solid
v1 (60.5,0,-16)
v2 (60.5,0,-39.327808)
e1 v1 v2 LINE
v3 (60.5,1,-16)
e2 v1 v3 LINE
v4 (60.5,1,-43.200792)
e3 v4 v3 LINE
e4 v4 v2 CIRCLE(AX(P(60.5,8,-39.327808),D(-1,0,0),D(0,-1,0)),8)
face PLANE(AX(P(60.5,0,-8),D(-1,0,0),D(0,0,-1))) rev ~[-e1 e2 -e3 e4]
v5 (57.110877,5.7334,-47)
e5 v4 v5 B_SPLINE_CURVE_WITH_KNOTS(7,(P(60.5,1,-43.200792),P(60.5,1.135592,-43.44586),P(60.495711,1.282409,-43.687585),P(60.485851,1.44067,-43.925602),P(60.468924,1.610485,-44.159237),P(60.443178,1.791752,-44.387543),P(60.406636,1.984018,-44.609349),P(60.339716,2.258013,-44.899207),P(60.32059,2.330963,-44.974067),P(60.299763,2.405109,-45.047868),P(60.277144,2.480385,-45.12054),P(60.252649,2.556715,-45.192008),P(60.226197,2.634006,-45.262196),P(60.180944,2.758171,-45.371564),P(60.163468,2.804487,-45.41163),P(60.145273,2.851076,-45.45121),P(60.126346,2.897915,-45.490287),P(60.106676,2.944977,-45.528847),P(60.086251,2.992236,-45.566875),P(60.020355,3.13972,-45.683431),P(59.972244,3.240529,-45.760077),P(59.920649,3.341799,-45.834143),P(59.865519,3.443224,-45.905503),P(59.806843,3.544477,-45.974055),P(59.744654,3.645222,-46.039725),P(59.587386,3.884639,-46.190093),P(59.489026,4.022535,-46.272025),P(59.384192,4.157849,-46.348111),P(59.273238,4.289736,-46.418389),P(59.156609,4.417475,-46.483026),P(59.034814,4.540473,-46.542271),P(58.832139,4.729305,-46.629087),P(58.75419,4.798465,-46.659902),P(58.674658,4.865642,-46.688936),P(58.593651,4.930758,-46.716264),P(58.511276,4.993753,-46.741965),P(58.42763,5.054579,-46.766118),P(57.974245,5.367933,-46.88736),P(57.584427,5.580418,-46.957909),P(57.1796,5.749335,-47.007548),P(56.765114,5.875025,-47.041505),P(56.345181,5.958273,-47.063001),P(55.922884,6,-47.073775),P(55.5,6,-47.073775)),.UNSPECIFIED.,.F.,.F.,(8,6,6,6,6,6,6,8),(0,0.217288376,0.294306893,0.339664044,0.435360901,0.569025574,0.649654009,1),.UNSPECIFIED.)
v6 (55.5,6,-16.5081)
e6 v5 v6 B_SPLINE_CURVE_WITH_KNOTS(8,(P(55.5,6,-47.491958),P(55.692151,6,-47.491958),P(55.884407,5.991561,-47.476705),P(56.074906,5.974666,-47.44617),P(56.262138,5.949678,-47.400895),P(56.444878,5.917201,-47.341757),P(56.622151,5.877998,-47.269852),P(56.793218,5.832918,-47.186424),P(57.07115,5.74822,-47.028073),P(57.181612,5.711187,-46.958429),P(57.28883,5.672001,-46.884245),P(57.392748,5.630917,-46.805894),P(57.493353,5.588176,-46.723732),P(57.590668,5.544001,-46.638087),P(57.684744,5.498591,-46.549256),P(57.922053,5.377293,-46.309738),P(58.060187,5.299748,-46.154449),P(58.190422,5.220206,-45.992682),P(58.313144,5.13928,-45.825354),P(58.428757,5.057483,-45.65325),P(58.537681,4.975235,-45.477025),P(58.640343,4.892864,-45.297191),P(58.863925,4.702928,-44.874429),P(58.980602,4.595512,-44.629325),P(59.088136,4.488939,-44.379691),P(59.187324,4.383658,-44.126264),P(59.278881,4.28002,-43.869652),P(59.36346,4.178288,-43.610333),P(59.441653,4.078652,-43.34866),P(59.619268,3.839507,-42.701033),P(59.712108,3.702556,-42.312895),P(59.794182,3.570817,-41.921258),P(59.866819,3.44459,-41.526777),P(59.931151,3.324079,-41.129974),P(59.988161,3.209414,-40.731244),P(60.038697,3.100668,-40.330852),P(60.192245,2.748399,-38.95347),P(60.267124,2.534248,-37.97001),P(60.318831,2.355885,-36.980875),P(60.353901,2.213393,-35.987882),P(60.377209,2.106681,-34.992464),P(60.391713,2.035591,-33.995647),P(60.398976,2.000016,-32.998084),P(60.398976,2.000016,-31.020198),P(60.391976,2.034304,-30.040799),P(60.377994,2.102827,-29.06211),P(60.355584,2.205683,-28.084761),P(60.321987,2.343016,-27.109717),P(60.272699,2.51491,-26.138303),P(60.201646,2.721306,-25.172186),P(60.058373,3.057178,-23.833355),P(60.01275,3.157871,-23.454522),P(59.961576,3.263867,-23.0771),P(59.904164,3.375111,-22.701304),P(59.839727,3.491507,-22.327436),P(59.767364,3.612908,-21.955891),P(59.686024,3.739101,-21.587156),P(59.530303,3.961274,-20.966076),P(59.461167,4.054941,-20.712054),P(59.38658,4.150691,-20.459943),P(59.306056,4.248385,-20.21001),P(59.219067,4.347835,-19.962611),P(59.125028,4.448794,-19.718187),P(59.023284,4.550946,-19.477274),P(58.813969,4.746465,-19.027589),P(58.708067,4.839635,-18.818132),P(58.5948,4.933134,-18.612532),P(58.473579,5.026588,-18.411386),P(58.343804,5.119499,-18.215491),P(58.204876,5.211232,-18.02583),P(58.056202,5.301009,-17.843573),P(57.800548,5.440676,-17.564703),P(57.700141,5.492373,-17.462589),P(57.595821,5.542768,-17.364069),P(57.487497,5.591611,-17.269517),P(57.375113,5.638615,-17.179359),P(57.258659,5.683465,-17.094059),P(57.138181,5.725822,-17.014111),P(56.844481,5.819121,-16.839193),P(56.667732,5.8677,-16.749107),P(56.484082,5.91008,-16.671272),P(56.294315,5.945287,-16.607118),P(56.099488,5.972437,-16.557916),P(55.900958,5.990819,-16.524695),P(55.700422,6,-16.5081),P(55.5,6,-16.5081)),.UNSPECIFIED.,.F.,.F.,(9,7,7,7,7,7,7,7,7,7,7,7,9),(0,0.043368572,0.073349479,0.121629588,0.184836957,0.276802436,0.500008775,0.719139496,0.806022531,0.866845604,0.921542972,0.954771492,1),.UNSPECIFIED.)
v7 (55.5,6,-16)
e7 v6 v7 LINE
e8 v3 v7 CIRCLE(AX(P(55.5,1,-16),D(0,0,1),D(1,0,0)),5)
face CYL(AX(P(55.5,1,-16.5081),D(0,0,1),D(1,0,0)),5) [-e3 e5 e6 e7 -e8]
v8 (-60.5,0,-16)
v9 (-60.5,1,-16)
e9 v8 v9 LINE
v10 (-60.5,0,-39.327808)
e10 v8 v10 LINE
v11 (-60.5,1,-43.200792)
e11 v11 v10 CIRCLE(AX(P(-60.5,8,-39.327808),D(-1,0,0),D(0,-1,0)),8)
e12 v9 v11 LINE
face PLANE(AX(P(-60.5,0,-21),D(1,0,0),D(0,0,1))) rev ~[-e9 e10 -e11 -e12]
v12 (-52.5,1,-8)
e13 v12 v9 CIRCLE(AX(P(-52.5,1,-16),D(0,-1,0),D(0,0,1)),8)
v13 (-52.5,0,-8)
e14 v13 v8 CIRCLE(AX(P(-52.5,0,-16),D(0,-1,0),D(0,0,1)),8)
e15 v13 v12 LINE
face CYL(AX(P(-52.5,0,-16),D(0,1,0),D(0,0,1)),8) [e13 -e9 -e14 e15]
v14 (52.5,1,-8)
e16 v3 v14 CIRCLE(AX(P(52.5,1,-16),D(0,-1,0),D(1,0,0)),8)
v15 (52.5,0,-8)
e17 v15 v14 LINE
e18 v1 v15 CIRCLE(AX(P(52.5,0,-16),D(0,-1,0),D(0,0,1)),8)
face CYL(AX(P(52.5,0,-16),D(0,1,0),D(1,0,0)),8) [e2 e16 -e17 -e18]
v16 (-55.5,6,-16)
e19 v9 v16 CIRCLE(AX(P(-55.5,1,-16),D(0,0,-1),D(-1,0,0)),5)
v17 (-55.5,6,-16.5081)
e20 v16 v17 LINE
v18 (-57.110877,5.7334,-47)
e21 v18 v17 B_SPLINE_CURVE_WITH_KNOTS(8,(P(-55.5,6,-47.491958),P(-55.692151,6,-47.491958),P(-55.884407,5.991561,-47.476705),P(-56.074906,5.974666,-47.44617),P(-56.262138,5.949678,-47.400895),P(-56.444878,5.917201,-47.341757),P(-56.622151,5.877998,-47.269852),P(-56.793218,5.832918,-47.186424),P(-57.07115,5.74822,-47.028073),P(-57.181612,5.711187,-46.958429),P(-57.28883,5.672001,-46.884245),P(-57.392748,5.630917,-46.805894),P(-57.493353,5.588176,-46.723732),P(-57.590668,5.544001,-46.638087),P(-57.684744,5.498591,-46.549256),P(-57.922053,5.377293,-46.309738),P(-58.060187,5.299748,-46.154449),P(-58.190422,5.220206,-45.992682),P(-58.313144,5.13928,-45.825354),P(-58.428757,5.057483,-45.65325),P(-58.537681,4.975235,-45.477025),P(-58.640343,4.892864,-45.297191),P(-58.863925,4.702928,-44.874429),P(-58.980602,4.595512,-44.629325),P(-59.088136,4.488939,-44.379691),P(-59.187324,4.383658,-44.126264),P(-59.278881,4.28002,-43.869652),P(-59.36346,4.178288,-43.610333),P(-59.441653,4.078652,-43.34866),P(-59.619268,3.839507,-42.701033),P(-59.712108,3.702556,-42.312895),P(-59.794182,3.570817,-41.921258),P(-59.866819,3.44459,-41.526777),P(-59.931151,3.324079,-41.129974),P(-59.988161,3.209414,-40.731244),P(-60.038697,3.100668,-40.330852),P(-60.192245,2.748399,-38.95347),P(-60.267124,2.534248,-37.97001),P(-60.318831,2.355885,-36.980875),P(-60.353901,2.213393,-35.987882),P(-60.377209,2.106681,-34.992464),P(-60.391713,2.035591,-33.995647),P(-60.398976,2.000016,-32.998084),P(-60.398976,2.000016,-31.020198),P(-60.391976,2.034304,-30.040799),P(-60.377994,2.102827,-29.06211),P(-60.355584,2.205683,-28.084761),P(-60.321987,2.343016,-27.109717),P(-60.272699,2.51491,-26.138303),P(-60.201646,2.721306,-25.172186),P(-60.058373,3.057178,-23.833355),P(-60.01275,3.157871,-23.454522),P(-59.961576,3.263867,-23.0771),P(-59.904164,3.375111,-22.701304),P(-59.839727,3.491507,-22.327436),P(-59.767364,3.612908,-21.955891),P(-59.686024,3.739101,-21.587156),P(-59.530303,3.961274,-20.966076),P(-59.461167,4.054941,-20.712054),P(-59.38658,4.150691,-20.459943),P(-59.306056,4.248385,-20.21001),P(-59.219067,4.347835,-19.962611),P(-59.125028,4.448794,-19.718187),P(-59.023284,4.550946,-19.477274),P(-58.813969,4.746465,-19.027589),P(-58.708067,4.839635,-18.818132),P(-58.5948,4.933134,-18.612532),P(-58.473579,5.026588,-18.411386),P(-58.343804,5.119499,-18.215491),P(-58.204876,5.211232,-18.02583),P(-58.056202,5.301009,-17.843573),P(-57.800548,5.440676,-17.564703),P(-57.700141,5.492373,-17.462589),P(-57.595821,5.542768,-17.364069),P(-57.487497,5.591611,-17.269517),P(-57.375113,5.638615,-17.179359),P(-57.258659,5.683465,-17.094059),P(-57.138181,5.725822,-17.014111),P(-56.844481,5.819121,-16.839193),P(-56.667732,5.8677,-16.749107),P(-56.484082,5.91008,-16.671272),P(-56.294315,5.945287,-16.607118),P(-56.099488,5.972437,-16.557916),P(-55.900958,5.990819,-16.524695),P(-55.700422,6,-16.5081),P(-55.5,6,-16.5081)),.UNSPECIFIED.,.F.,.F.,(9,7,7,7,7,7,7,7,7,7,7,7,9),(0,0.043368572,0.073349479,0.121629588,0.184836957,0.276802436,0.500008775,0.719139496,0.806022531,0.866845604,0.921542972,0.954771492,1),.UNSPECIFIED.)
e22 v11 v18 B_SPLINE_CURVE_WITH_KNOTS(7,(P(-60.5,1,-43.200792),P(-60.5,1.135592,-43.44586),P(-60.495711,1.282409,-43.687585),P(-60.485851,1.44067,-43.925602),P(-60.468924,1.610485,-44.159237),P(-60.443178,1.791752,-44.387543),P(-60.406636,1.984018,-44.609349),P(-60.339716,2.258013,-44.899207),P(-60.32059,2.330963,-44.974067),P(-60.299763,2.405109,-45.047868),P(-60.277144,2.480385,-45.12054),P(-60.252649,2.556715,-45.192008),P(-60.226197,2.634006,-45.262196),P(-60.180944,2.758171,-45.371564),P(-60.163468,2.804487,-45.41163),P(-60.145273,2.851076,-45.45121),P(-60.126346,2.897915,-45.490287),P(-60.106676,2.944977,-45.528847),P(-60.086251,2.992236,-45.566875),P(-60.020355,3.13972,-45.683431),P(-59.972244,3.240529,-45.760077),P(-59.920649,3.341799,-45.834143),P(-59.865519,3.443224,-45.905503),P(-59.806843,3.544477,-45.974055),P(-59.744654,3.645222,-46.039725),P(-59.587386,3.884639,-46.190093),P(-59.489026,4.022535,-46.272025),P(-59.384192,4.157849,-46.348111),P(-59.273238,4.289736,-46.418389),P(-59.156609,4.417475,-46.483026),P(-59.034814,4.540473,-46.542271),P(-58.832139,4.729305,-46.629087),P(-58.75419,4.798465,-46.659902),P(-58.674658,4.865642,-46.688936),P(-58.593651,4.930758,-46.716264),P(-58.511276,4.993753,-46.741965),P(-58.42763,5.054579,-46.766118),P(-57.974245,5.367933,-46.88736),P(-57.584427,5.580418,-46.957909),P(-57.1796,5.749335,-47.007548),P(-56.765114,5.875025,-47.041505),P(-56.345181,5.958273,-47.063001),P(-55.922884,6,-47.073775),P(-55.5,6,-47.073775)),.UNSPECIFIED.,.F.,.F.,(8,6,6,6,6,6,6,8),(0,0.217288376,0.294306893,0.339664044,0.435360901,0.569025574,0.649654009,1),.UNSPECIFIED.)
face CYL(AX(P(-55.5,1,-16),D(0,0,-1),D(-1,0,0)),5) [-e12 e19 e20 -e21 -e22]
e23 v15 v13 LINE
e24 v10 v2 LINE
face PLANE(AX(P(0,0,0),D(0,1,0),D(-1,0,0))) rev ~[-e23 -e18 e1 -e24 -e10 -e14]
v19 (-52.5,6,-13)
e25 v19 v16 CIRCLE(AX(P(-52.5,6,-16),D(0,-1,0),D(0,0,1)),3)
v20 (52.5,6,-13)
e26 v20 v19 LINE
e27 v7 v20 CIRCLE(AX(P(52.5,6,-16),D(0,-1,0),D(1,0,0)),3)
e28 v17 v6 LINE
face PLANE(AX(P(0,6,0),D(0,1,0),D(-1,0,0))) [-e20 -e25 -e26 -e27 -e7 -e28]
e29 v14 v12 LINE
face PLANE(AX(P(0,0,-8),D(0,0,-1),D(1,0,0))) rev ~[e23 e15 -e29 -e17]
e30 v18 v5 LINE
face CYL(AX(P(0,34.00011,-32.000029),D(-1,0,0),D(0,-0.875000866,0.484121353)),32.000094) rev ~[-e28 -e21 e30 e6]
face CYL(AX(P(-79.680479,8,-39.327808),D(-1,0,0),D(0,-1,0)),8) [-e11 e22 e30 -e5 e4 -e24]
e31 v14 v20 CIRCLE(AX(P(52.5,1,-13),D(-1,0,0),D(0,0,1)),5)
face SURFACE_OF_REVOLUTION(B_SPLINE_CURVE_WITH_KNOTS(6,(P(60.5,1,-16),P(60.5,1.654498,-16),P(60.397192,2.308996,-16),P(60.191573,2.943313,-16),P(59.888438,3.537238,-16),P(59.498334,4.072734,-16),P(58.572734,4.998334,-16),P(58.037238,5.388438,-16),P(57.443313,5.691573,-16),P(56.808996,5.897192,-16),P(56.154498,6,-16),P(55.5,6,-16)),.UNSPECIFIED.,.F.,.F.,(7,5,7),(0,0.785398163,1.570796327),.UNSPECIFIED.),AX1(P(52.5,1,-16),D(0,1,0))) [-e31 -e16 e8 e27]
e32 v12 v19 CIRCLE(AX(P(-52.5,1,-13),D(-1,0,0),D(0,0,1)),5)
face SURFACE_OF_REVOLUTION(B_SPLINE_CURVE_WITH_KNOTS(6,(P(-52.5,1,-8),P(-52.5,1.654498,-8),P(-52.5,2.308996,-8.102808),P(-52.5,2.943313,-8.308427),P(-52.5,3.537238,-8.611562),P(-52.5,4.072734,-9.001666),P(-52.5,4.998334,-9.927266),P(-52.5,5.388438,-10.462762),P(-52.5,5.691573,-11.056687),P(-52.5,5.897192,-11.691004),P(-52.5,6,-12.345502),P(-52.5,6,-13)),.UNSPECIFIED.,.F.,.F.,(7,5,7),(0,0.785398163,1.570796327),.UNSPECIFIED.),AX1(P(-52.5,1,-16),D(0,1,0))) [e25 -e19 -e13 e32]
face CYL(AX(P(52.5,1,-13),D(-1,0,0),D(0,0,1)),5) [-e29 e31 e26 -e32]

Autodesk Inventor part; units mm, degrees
ref_plane "YZ Plane" through (0, 0, 0) normal (1, 0, 0) x (0, 1, 0)
ref_plane "XZ Plane" through (0, 0, 0) normal (0, 1, 0) x (-1, 0, 0)
ref_plane "XY Plane" through (0, 0, 0) normal (0, 0, 1) x (1, 0, 0)
sketch "Sketch1" plane through (0, 0, 0) normal (0, 1, 0) x (-1, 0, 0)
  line L0 (25.9, 0) -> (-25.9, 0) projected
  line L1 (0, -25.9) -> (0, 25.9) projected
  circle A0 centre (0, 0) radius 18.5 construction
  circle A1 centre (0, 0) radius 13 construction
  dimension "d0" = 37
  dimension "d1" = 26
sketch "Sketch2" plane through (0, 0, 0) normal (0, 1, 0) x (-1, 0, 0)
  line L0 (0, -28.9) -> (0, 26.4) projected
  line L1 (-60.5, -8) -> (-60.5, -21)
  line L2 (-60.5, -21) -> (60.5, -21)
  line L3 (60.5, -21) -> (60.5, -8)
  line L4 (60.5, -8) -> (-60.5, -8)
  line L5 (-84.7, 0) -> (84.7, 0) projected
  point P0 (0, 0)
  dimension "d3" = 121
  dimension "d99" = 8
  dimension "d101" = 21
extrude "Extrusion1" add sketch "Sketch2" along normal blind 6
sketch "Sketch6" plane through (0, 0, 0) normal (0, 1, 0) x (-1, 0, 0)
  line L0 (60.5, -21) -> (-60.5, -21) projected
  line L1 (60.5, -8) -> (60.5, -21) projected
  line L2 (-60.5, -21) -> (60.5, -21)
  line L3 (60.5, -21) -> (60.5, -8)
  line L4 (-60.5, -8) -> (-60.5, -21)
  line L5 (84.7, 0) -> (-84.7, 0) projected
  line L6 (0, -28.9) -> (0, 26.4) projected
  arc A0 (-16, 0) -> (16, 0) centre (0, 0) ccw
  line L7 (16, 0) -> (16, 0)
  line L8 (60.5, 0) -> (-60.5, 0) projected
  line L9 (16, 0) -> (60.5, 0)
  line L10 (-16, 0) -> (-16, 0)
  line L11 (-16, 0) -> (-60.5, 0)
  point P0 (-17.3617, -21)
  dimension "d18" = 32
extrude "Extrusion5" [suppressed]
sketch "Sketch4" plane through (0, 0, 0) normal (0, 0, 1) x (1, 0, 0)
  line L0 (-18.5, 0) -> (18.5, 0)
  line L1 (18.5, 0) -> (18.5, -2)
  line L2 (18.5, -2) -> (-18.5, -2)
  line L3 (-18.5, -2) -> (-18.5, 0)
  line L4 (-25.9, 0) -> (25.9, 0) projected
  line L5 (0, -2.4) -> (0, 0.4) projected
  point P0 (0, 0)
  dimension "d10" = 37
  dimension "d11" = 2
extrude "Extrusion6" [suppressed]
sketch "Sketch5" plane through (0, 0, 0) normal (0, 1, 0) x (-1, 0, 0)
  circle A0 centre (0, 0) radius 18.5 construction
  circle A1 centre (0, 0) radius 18.5 construction
  line L0 (25.9, 0) -> (-25.9, 0) projected
  line L1 (0, -28.9) -> (0, 26.4) projected
  line L2 (-18.5, -21) -> (18.5, -21)
  line L3 (18.5, -21) -> (18.5, -18.5)
  line L4 (18.5, -18.5) -> (-18.5, -18.5)
  line L5 (-18.5, -18.5) -> (-18.5, -21)
  dimension "d25" = 37
  dimension "d26" = 21
extrude "Extrusion7" [suppressed]
sketch "Sketch7" plane through (0, 0, 0) normal (0, 0, 1) x (1, 0, 0)
  line L0 (-18.5, 0) -> (18.5, 0)
  line L1 (18.5, 0) -> (18.5, -2)
  line L2 (18.5, -2) -> (-18.5, -2)
  line L3 (-18.5, -2) -> (-18.5, 0)
  line L4 (60.5, 0) -> (-60.5, 0) projected
  line L5 (-84.7, 0) -> (84.7, 0) projected
  line L6 (0, -2.4) -> (0, 0.4) projected
  point P0 (-16, 0)
  point P1 (16, 0)
  dimension "d53" = 2
  dimension "d54" = 18.5
extrude "Extrusion8" [suppressed]
sketch "Sketch8" plane through (0, 0, 0) normal (0, 1, 0) x (-1, 0, 0)
  circle A0 centre (0, 0) radius 12.75
  dimension "d34" = 25.5
extrude "Extrusion9" [suppressed]
pattern_linear "Rectangular Pattern1" [suppressed]
sketch "Sketch9" plane through (0, 6, 0) normal (0, 1, 0) x (1, 0, 0)
  circle A0 centre (0, 0) radius 13
  circle A1 centre (0, 0) radius 15
  dimension "d40" = 26
  dimension "d41" = 30
extrude "Extrusion10" [suppressed]
sketch "Sketch10" plane through (0, 5, 0) normal (0, 1, 0) x (1, 0, 0)
  arc A0 (16, 0) -> (-16, 0) centre (0, 0) ccw projected
  line L0 (1.5, -18) -> (-1.5, -18)
  line L1 (-29.4, 0) -> (29.4, 0) projected
  line L2 (0, 36.3) -> (0, -70.8) projected
  line L3 (1.5, -12) -> (-1.5, -12)
  line L4 (1.5, -12) -> (1.5, -18)
  line L5 (-1.5, -18) -> (-1.5, -12)
  dimension "d48" = 3
  dimension "d49" = 12
  dimension "d50" = 6
extrude "Extrusion11" [suppressed]
fillet "Fillet1" [suppressed]
sketch "Sketch11" plane through (0, 0, 0) normal (0, 1, 0) x (-1, 0, 0)
  line L0 (-60.5, -21) -> (60.5, -21)
  line L1 (60.5, -21) -> (60.5, -47)
  line L2 (60.5, -47) -> (-60.5, -47)
  line L3 (-60.5, -47) -> (-60.5, -21)
  line L4 (84.7, 0) -> (-84.7, 0) projected
  line L5 (0, -60.1) -> (0, 31.6) projected
  point P0 (0, 0)
  dimension "d57" = 26
  dimension "d58" = 21
  dimension "d59" = 121
extrude "Extrusion12" add sketch "Sketch11" along normal blind 6
sketch "Sketch12" plane through (0, 0, 0) normal (1, 0, 0) x (0, 1, 0)
  line L0 (6, -8) -> (6, -47) projected
  arc A0 (6, -16.5081) -> (5.7334, -47) centre (34, -32) ccw
  line L1 (-6.8, 0) -> (40.8, 0) projected
  line L2 (0, -66) -> (0, 67) projected
  line L3 (6, -16.5081) -> (6, -47)
  line L4 (6, -47) -> (5.7334, -47)
  line L5 (0, -47) -> (6, -47) projected
  point P0 (0, 0)
  point P1 (6, 48)
  dimension "d62" = 32
  dimension "d63" = 32
  dimension "d64" = 34
extrude "Extrusion13" cut sketch "Sketch12" along normal through all both and the other way through all
fillet "Fillet3" radius 8 1 edges at (0, 0, -47)
sketch "Sketch13" plane through (0, 0, 0) normal (0, 1, 0) x (-1, 0, 0)
  line L0 (84.7, 0) -> (-84.7, 0) projected
  line L1 (0, -57.9802) -> (0, 72.5866) projected
  line L2 (60.5, -8) -> (60.5, -39.3278) projected
  arc A0 (13.0815, 23.9185) -> (13.0815, 13.0815) centre (18.5, 18.5) ccw
  line L3 (-60.5, -8) -> (-60.5, -16.5081) projected
  arc A1 (-13.0815, 13.0815) -> (-13.0815, 23.9185) centre (-18.5, 18.5) ccw
  line L4 (18.5, 37) -> (18.5, 0)
  line L5 (-18.5, 0) -> (-18.5, 37)
  line L6 (18.5, 37) -> (18.5, -8)
  line L7 (-60.5, 0) -> (60.5, 0) projected
  line L8 (-18.5, -8) -> (-18.5, 37)
  arc A2 (-9.2871, 53) -> (-13.0815, 23.9185) centre (0, 37) ccw
  arc A3 (13.0815, 23.9185) -> (9.2871, 53) centre (0, 37) ccw
  arc A4 (-13.0815, 13.0815) -> (-18.5, 0) centre (0, 0) ccw
  arc A5 (18.5, 0) -> (13.0815, 13.0815) centre (0, 0) ccw
  point P0 (60.5, -39.3278)
  point P1 (-55.5, 48)
  point P2 (-60.5, -16.5081)
  dimension "d68" = 37
  dimension "d71" = 18.5
  dimension "d72" = 18.5
  dimension "d73" = 7.663
  dimension "d74" = 7.663
  dimension "d75" = 18.5
  dimension "d76" = 18.5
  dimension "d77" = 18.5
  dimension "d78" = 18.5
extrude "Extrusion14" [suppressed]
sketch "Sketch14" plane through (0, 0, 0) normal (0, 1, 0) x (-1, 0, 0)
  circle A0 centre (18.5, 18.5) radius 10
  line L0 (39.9, 0) -> (-39.9, 0) projected
  line L1 (0, -27.9) -> (0, 37.9) projected
  circle A1 centre (-18.5, 18.5) radius 10
  point P0 (0, 0)
  dimension "d84" = 18.5
  dimension "d85" = 18.5
  dimension "d86" = 20
  dimension "d89" = 37
extrude "Extrusion15" [suppressed]
fillet "Fillet4" [suppressed]
fillet "Fillet5" radius 8 2 edges at (-60.5, 3, -8) (60.5, 3, -8)
fillet "Fillet6" radius 5 5 edges at (58.1569, 6, -10.3431) (60.5, 6, -16.254) (-58.1569, 6, -10.3431) (-60.5, 6, -16.254) (0, 6, -8)
equation "\"d85\" = d84"
properties part number "NespressoSpeedfiller-6X-scraper"
